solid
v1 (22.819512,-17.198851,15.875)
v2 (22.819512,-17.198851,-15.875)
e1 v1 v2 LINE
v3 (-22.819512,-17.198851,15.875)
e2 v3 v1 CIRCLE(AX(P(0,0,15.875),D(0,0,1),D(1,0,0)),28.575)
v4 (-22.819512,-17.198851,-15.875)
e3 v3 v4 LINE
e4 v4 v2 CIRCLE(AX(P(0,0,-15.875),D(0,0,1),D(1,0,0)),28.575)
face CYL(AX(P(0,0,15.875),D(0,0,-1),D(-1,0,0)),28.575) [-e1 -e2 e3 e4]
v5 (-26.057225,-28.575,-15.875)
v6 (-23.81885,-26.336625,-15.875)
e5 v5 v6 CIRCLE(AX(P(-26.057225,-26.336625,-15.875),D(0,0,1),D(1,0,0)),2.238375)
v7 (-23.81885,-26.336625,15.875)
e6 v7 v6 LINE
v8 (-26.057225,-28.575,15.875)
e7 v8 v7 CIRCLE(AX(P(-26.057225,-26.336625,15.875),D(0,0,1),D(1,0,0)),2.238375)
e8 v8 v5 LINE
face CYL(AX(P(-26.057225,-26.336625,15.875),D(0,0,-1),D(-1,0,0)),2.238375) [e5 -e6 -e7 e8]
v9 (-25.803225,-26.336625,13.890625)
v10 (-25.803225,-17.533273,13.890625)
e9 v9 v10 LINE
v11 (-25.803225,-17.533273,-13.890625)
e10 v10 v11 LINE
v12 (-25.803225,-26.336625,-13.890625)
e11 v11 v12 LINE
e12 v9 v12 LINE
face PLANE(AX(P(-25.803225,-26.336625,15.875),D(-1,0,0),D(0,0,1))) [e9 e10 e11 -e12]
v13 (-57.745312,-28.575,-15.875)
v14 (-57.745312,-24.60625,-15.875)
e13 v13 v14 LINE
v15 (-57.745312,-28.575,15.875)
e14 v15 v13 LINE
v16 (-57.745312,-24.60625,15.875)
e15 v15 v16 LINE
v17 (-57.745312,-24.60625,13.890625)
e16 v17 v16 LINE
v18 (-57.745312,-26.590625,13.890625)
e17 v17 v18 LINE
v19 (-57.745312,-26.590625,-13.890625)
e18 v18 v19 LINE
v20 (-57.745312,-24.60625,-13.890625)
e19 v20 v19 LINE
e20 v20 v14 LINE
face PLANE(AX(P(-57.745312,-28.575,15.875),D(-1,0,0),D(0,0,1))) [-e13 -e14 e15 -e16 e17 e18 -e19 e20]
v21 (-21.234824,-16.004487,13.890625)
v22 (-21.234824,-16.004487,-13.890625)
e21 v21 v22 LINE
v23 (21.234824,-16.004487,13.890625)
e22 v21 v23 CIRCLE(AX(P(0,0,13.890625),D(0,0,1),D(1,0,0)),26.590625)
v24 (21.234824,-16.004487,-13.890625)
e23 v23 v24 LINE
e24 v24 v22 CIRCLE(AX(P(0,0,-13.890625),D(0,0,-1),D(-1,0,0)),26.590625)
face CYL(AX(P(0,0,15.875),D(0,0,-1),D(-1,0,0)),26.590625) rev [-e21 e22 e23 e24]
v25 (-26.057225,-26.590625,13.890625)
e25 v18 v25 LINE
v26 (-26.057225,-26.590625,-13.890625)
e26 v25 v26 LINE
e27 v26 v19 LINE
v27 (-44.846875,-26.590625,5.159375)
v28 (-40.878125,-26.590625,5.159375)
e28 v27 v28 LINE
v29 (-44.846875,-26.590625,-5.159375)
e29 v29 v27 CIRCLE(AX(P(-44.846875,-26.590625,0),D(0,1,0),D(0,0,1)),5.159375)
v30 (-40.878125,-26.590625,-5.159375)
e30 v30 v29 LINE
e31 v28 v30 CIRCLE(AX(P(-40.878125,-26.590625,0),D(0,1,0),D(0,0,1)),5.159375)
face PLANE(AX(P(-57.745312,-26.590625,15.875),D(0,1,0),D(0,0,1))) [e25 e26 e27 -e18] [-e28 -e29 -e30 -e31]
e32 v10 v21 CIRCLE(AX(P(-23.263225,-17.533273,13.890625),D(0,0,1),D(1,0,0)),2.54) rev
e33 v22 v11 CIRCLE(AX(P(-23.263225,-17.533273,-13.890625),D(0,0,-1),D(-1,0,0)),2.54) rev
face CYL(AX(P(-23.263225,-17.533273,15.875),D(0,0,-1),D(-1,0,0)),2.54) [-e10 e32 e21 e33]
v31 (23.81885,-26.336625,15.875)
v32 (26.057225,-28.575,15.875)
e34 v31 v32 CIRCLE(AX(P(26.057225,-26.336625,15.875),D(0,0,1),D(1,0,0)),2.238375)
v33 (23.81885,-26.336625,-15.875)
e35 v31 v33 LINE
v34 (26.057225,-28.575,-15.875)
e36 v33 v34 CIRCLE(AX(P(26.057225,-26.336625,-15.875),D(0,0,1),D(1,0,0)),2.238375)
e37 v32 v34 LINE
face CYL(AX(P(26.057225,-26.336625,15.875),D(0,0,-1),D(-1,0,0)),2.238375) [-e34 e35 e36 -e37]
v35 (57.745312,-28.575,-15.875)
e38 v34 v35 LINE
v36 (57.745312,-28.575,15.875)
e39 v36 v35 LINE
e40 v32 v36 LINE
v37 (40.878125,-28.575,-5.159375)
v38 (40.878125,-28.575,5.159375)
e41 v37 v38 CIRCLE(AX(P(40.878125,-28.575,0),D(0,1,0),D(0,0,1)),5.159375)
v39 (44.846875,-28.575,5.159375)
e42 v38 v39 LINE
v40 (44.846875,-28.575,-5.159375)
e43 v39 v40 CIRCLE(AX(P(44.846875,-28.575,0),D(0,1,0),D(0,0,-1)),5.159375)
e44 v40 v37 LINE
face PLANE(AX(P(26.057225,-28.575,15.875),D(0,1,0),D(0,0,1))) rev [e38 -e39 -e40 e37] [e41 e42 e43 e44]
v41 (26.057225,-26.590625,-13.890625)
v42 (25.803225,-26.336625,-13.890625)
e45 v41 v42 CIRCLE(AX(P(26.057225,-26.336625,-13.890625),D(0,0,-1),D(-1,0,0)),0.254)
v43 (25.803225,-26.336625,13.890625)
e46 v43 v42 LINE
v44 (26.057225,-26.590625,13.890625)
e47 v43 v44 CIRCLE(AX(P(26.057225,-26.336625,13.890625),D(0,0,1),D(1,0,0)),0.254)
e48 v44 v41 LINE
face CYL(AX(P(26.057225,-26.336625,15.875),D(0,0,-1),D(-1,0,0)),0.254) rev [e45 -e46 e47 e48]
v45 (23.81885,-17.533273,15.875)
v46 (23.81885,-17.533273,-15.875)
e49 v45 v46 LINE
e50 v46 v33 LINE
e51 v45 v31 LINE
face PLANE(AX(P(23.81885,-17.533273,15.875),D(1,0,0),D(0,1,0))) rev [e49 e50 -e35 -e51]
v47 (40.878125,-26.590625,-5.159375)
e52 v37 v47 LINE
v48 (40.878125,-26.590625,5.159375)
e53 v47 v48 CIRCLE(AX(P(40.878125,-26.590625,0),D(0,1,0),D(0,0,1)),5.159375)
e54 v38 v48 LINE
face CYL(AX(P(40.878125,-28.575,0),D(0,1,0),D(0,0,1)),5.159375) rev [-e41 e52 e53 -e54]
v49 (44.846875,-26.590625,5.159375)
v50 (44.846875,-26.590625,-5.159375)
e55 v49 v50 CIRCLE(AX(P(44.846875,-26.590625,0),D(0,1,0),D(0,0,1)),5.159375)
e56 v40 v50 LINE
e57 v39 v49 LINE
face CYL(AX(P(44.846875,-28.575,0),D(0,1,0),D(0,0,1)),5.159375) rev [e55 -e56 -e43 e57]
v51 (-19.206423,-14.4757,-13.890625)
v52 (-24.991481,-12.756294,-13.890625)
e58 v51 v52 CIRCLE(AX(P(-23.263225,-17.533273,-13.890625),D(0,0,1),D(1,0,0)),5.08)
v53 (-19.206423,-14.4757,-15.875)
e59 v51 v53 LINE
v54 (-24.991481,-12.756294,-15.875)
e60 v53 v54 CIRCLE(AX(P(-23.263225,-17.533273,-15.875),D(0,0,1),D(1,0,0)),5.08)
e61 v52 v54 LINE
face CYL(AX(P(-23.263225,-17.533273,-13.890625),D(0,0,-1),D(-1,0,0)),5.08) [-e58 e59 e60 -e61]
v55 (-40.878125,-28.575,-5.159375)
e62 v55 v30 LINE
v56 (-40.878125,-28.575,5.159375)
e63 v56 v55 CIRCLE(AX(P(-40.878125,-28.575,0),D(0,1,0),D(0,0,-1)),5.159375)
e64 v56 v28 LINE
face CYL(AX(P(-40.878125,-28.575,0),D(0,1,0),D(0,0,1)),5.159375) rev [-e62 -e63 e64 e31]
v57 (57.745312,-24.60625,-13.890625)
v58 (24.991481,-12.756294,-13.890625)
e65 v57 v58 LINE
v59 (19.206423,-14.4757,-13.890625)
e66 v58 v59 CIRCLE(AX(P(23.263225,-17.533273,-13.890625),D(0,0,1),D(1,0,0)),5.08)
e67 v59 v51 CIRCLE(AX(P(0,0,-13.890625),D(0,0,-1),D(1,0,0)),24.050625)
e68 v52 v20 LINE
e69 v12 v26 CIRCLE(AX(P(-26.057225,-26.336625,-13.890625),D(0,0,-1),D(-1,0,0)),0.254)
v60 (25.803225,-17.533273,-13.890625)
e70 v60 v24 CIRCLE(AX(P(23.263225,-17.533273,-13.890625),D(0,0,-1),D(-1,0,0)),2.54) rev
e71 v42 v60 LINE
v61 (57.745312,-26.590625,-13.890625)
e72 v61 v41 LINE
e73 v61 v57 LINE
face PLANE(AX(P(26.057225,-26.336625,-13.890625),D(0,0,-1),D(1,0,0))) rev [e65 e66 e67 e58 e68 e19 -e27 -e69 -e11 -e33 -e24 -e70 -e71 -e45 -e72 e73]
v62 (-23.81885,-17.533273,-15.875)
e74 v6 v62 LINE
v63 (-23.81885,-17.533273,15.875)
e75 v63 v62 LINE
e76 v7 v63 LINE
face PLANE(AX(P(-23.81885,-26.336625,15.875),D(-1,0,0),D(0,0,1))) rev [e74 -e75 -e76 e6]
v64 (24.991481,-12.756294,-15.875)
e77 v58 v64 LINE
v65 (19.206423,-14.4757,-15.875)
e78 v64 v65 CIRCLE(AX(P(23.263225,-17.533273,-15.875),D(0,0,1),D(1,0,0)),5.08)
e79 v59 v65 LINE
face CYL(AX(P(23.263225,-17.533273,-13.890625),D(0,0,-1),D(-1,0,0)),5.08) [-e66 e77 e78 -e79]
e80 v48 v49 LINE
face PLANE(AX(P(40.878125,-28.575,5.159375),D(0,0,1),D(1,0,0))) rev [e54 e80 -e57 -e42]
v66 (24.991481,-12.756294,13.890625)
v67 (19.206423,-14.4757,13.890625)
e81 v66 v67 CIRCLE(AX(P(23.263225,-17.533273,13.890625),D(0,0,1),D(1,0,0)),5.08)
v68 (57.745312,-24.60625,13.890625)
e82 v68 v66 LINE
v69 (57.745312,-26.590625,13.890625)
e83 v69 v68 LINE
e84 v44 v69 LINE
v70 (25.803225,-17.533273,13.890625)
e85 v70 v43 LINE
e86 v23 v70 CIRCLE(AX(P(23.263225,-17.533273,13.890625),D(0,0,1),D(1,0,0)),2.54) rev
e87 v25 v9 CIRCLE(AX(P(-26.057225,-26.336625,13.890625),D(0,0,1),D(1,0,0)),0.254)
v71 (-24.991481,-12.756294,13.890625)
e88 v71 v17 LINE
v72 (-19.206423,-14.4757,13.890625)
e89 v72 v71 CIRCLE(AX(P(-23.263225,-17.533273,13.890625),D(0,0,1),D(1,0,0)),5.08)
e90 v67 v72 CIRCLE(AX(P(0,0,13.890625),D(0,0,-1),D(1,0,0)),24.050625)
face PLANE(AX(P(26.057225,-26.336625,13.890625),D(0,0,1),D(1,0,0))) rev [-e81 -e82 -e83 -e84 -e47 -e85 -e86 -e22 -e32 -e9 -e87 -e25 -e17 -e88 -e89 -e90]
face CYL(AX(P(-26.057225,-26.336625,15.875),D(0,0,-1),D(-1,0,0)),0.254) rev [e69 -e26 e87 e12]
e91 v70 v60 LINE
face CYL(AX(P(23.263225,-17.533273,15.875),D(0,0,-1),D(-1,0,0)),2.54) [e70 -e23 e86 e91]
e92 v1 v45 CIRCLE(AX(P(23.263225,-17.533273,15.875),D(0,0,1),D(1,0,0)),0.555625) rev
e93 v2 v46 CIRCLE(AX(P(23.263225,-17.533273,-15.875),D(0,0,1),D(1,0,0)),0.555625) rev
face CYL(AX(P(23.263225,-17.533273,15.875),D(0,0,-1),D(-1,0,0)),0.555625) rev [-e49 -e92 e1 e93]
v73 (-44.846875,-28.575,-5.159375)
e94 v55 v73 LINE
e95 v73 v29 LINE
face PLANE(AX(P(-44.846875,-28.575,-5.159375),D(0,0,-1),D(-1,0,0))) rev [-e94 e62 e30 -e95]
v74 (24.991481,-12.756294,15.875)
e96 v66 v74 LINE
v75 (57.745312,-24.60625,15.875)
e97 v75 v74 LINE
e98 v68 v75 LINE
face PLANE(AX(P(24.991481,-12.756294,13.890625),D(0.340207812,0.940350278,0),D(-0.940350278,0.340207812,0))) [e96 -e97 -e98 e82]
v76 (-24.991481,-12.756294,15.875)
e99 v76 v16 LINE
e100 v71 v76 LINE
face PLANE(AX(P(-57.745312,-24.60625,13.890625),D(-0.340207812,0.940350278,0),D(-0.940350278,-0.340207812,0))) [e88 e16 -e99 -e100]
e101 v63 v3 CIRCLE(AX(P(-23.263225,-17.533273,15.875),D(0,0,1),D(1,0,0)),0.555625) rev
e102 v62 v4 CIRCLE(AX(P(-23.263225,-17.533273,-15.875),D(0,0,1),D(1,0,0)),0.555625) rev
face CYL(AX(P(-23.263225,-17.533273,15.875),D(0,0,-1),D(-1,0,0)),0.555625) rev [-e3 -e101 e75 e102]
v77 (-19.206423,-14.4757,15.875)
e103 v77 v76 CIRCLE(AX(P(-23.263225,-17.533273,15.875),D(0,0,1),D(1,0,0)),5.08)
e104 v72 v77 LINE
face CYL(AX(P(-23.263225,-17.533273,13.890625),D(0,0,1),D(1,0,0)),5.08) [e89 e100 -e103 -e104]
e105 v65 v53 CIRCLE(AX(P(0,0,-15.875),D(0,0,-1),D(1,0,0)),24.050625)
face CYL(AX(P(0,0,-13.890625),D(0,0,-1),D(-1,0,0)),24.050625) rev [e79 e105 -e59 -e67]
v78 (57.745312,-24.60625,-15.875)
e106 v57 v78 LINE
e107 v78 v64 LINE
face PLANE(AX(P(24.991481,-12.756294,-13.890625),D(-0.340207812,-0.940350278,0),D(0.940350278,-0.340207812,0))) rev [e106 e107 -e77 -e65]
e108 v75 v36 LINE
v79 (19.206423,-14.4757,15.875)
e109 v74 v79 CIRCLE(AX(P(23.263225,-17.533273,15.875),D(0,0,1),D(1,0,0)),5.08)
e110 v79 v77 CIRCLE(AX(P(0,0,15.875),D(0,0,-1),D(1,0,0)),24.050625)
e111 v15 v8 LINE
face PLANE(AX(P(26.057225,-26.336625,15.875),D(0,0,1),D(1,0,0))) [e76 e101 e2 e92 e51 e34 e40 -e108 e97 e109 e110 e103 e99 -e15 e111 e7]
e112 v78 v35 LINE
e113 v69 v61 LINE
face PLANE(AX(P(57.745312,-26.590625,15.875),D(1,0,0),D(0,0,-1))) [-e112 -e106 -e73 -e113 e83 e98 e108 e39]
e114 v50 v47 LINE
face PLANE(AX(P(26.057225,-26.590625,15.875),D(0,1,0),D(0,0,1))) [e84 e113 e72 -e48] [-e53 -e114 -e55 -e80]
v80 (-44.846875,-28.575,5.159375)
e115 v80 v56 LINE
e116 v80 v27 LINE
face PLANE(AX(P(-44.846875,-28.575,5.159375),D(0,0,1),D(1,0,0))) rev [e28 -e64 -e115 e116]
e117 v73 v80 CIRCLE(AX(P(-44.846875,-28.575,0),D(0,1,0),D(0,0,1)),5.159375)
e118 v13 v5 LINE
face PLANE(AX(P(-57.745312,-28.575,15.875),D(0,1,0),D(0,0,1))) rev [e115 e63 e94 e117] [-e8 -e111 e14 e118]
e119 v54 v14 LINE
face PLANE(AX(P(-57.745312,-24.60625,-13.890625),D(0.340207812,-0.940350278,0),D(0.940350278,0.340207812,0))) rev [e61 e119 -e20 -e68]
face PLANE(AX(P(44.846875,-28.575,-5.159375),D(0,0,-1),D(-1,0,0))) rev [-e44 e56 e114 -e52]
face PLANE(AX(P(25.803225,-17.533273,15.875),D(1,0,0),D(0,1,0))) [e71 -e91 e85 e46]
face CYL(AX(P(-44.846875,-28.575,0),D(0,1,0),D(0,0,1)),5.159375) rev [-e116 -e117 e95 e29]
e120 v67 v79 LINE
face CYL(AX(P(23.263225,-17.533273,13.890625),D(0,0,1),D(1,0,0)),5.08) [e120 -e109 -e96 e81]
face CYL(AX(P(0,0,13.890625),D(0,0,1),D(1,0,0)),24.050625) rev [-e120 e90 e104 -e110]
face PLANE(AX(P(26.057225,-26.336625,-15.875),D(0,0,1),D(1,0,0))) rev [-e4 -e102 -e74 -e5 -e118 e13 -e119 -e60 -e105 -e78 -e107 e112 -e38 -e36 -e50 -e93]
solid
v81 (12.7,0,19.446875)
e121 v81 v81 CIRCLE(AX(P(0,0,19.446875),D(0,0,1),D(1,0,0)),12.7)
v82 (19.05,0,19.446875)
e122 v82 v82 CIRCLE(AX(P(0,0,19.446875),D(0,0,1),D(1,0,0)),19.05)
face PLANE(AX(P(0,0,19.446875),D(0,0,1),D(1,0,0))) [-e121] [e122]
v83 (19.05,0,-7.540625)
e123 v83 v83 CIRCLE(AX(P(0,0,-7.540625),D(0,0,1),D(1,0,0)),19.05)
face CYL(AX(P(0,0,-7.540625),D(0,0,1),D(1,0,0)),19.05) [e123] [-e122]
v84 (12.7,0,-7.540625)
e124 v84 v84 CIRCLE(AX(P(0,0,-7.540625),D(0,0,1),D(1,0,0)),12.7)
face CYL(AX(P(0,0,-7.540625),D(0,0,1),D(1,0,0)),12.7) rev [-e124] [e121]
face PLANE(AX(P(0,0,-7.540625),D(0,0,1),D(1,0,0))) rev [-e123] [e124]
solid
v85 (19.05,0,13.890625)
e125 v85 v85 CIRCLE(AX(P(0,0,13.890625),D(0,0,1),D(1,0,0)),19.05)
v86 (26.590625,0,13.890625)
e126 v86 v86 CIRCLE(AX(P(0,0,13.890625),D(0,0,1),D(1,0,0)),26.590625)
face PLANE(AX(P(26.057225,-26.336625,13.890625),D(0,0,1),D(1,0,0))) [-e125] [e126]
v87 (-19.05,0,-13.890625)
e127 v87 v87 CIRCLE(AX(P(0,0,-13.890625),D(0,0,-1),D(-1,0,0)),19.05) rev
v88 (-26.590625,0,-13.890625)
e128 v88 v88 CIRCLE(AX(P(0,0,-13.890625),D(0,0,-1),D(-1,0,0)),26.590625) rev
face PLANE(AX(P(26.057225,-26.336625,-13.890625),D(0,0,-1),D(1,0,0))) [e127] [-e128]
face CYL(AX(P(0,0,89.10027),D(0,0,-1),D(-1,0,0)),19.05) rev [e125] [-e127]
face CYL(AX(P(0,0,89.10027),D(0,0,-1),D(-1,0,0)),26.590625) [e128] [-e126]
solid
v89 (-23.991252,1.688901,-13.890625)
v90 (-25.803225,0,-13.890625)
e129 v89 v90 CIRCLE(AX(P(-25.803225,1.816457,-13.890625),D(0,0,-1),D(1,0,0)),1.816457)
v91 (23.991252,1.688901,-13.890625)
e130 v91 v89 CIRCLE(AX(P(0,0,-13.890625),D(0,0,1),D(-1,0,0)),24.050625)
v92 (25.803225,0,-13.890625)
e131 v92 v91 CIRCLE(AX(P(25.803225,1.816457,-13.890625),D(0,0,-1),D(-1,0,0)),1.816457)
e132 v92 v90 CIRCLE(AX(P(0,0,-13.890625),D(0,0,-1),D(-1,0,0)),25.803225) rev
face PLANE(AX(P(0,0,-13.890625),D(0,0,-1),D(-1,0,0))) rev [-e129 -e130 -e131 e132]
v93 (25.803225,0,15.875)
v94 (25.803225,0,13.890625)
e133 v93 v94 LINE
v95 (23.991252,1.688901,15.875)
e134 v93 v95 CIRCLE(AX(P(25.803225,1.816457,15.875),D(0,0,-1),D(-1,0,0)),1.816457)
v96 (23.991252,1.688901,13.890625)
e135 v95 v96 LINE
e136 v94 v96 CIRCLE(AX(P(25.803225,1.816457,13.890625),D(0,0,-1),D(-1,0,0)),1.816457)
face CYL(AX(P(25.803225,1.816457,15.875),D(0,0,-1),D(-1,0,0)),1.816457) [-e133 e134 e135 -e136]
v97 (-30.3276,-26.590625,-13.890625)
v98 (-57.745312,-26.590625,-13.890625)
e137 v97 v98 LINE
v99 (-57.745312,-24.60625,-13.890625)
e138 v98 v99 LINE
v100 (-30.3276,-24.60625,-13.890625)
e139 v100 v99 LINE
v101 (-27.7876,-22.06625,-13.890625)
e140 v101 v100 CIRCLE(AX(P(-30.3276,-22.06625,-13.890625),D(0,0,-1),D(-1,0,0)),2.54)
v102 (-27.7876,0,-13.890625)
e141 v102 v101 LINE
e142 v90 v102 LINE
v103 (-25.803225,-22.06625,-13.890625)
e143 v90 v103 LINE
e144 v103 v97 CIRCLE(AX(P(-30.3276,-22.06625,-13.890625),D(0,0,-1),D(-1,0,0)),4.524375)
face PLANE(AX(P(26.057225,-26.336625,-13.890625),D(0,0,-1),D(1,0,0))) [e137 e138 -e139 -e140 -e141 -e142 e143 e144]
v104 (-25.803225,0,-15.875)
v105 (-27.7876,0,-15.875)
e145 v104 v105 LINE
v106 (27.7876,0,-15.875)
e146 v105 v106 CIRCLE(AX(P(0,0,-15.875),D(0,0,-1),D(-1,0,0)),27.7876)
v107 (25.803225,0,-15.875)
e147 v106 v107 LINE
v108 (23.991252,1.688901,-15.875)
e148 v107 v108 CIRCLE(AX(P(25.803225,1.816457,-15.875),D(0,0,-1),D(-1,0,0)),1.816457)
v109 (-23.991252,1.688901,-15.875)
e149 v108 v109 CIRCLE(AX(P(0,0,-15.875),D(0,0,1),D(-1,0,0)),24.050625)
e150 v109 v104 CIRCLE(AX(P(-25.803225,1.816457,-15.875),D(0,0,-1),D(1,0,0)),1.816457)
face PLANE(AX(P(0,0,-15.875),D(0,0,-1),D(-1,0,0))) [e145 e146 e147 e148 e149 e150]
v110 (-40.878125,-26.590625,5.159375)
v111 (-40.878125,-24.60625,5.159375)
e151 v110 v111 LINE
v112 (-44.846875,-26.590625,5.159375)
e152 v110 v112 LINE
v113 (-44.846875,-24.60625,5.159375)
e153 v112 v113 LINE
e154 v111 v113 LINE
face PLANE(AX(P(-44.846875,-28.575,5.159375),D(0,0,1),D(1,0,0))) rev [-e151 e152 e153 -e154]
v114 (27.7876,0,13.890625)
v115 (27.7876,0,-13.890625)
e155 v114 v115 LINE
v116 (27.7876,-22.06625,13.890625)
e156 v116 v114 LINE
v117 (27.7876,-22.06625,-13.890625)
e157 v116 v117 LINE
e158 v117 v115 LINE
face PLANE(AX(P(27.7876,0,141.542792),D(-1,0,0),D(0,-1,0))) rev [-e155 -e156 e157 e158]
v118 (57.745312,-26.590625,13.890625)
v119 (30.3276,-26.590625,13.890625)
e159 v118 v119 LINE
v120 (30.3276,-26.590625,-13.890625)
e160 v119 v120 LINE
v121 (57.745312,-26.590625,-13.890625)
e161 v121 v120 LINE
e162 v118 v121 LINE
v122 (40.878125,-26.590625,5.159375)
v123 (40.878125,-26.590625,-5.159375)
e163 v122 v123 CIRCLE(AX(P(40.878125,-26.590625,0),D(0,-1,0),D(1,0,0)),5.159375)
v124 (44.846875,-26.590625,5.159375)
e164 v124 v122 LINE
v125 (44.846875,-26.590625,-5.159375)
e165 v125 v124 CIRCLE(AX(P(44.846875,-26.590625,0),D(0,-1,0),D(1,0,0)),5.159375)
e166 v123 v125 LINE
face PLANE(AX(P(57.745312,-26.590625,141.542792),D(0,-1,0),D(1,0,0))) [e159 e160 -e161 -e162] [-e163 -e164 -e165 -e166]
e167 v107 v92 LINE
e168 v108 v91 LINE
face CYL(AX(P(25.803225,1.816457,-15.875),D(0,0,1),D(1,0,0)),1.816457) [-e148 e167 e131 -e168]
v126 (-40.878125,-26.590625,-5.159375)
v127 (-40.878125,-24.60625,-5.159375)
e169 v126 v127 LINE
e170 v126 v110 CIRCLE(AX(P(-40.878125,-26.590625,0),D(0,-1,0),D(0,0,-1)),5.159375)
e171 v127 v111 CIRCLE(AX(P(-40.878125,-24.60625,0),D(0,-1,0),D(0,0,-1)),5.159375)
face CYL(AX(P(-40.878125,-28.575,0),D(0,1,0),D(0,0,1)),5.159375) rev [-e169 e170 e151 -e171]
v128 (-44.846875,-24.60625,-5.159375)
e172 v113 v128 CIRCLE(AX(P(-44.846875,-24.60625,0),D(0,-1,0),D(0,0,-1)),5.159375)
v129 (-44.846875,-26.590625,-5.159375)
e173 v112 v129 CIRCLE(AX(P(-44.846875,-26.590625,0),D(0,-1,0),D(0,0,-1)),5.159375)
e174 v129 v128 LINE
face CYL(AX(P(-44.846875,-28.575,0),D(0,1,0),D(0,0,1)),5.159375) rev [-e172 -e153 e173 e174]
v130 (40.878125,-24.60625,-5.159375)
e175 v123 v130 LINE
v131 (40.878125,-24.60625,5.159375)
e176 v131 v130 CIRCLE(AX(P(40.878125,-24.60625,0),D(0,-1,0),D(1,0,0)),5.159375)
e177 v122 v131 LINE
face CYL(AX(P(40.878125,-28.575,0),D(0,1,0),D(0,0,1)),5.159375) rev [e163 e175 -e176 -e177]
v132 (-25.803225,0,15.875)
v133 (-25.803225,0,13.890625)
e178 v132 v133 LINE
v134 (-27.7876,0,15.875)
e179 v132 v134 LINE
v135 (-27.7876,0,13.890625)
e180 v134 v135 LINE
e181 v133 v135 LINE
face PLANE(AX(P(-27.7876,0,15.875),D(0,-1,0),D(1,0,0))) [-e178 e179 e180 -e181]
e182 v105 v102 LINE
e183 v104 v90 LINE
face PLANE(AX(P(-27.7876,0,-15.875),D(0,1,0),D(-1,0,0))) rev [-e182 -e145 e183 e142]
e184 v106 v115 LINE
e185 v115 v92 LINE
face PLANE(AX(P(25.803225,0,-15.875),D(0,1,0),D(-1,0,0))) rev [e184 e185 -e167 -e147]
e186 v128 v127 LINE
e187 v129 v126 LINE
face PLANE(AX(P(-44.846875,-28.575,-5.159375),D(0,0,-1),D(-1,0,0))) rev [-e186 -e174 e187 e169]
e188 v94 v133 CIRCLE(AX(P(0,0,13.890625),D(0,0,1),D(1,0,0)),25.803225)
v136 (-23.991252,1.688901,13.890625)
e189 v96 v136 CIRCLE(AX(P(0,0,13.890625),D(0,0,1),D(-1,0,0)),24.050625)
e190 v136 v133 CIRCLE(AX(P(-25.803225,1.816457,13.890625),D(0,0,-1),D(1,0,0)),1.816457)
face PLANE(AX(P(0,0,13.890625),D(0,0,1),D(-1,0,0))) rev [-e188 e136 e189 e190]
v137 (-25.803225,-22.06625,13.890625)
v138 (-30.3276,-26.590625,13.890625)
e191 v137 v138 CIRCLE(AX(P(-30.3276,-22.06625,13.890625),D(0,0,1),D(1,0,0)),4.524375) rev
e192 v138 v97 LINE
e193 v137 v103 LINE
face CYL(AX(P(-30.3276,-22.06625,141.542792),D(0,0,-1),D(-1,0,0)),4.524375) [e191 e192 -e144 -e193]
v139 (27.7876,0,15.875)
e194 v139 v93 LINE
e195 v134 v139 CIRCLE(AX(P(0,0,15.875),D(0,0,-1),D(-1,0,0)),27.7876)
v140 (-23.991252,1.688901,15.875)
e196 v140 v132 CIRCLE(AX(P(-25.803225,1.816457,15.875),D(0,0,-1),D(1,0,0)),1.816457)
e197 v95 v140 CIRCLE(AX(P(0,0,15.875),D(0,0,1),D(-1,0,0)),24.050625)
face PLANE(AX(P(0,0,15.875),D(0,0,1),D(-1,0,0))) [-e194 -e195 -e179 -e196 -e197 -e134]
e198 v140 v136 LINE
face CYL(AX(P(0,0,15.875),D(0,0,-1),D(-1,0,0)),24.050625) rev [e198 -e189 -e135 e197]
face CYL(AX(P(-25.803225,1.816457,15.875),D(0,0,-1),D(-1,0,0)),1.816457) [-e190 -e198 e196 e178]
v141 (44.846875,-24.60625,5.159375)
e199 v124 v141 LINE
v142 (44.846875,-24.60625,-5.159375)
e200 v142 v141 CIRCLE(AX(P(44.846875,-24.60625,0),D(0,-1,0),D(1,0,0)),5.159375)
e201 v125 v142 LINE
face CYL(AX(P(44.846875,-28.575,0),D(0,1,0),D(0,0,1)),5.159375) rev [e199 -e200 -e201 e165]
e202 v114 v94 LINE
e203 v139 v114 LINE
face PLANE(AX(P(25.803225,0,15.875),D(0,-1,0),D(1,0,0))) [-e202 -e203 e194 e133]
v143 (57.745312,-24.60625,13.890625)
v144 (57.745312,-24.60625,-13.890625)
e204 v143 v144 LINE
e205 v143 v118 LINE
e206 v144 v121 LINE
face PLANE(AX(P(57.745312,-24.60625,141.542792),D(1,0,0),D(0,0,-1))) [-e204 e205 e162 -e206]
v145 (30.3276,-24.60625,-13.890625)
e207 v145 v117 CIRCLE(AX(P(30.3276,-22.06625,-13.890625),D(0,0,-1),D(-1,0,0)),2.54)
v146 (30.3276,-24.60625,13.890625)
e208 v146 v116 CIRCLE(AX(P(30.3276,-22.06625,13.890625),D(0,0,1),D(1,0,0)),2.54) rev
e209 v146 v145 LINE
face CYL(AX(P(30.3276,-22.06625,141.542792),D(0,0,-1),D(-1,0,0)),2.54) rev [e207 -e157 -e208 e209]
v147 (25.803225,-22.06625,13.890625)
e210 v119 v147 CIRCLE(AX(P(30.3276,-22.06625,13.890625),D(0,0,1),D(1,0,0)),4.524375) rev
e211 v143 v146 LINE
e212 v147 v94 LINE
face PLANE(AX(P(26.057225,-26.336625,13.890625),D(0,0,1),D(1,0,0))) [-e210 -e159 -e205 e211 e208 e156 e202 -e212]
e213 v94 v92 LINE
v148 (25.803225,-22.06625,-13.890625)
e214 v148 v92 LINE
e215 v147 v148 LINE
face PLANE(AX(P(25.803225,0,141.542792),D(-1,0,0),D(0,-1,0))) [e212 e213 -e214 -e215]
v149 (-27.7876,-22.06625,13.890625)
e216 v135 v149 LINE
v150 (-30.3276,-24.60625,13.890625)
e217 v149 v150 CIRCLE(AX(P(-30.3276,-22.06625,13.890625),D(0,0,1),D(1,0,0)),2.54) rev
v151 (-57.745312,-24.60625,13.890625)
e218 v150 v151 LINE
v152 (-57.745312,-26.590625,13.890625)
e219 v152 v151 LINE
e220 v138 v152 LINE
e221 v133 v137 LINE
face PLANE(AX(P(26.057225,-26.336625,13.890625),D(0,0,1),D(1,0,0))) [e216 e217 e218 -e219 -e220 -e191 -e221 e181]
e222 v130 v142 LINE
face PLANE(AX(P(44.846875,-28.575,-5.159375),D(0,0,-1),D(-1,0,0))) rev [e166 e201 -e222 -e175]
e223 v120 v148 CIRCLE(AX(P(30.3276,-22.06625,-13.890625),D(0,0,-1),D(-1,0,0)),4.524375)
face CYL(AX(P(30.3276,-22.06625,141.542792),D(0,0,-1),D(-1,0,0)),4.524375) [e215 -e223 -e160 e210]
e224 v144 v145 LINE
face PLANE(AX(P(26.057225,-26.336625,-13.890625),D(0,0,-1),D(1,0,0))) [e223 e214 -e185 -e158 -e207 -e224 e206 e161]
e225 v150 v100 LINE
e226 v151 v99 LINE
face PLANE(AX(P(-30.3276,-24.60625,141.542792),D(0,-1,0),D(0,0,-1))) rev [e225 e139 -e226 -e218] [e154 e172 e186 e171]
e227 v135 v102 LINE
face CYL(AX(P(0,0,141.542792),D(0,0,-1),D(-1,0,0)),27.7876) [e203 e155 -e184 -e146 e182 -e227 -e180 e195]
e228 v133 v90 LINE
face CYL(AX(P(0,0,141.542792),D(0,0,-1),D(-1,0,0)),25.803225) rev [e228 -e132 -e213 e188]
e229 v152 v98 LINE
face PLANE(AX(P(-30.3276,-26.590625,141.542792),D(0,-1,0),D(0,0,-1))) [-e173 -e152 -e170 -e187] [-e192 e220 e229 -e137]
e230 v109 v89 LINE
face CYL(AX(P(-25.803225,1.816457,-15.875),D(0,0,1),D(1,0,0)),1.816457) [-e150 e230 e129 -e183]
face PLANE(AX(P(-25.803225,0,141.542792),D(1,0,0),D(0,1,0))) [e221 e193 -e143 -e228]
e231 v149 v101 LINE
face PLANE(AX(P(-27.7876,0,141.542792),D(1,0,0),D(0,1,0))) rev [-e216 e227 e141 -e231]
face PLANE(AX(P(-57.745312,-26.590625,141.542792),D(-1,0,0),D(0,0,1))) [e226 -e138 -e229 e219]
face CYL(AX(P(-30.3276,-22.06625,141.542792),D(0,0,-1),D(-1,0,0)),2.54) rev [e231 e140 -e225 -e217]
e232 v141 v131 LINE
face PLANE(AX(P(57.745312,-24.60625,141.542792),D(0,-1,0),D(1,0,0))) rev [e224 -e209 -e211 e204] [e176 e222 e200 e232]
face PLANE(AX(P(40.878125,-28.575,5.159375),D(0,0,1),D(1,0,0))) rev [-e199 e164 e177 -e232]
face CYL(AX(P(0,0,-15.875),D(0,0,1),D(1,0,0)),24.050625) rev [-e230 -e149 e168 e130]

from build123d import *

# Parameters (mm, degrees)
EXTRUDE_THIN2_DEPTH      = 15.875
EXTRUDE1_DEPTH           = 1.984375
EXTRUDE_THIN3_DEPTH      = 13.890625
EXTRUDE_THIN3_DEPTH_BACK = 13.890625
EXTRUDE2_DEPTH           = 1.984375
EXTRUDE3_START           = -13.890625
EXTRUDE3_OUTLINE_R       = 26.590625
EXTRUDE3_OUTLINE_R_2     = 19.05
EXTRUDE3_DEPTH           = 27.78125
SKETCH8_R                = 19.05
SKETCH8_R_2              = 12.7
EXTRUDE4_DEPTH           = 26.9875
CUT_EXTRUDE1_DEPTH       = 68.299574204


# Read off the part's stored shape, not the designer's step: Extrude3
with BuildPart() as part:
    # Sketch1 → Extrude-Thin2 (new, symmetric)
    with BuildSketch(Plane.XY):
        with BuildLine():
            Line((-57.7453125, -26.590625), (-26.057225, -26.590625))
            ThreePointArc((-26.057225, -26.590625), (-25.877619878, -26.516230122), (-25.803225, -26.336625))
            Line((-25.803225, -26.336625), (-25.803225, -17.533273382))
            ThreePointArc((-25.803225, -17.533273382), (-24.069283693, -15.124566388), (-21.23482391, -16.004486602))
            ThreePointArc((-21.23482391, -16.004486602), (0, -26.590625), (21.23482391, -16.004486602))
            ThreePointArc((21.23482391, -16.004486602), (24.069283693, -15.124566388), (25.803225, -17.533273382))
            Line((25.803225, -17.533273382), (25.803225, -26.336625))
            ThreePointArc((25.803225, -26.336625), (25.877619878, -26.516230122), (26.057225, -26.590625))
            Line((26.057225, -26.590625), (57.7453125, -26.590625))
            Line((57.7453125, -26.590625), (57.7453125, -28.575))
            Line((57.7453125, -28.575), (26.057225, -28.575))
            ThreePointArc((26.057225, -28.575), (24.474454859, -27.919395141), (23.81885, -26.336625))
            Line((23.81885, -26.336625), (23.81885, -17.533273382))
            ThreePointArc((23.81885, -17.533273382), (23.439550339, -17.006368727), (22.819512262, -17.198851274))
            ThreePointArc((22.819512262, -17.198851274), (0, -28.575), (-22.819512262, -17.198851274))
            ThreePointArc((-22.819512262, -17.198851274), (-23.439550339, -17.006368727), (-23.81885, -17.533273382))
            Line((-23.81885, -17.533273382), (-23.81885, -26.336625))
            ThreePointArc((-23.81885, -26.336625), (-24.474454859, -27.919395141), (-26.057225, -28.575))
            Line((-26.057225, -28.575), (-57.7453125, -28.575))
            Line((-57.7453125, -28.575), (-57.7453125, -26.590625))
        make_face()
    extrude(amount=EXTRUDE_THIN2_DEPTH, both=True)

    # Sketch4 → Extrude1 (add)
    with BuildSketch(Plane.XY.offset(15.875)):
        with BuildLine():
            Line((-57.7453125, -24.60625), (-24.991480683, -12.756293971))
            ThreePointArc((-24.991480683, -12.756293971), (-21.815944337, -12.663799213), (-19.20642282, -14.475699822))
            ThreePointArc((-19.20642282, -14.475699822), (0, -24.050625), (19.20642282, -14.475699822))
            ThreePointArc((19.20642282, -14.475699822), (21.815944337, -12.663799213), (24.991480683, -12.756293971))
            Line((24.991480683, -12.756293971), (57.7453125, -24.60625))
            Line((57.7453125, -24.60625), (57.7453125, -28.575))
            Line((57.7453125, -28.575), (26.057225, -28.575))
            ThreePointArc((26.057225, -28.575), (24.474454859, -27.919395141), (23.81885, -26.336625))
            Line((23.81885, -26.336625), (23.81885, -17.533273382))
            ThreePointArc((23.81885, -17.533273382), (23.439550339, -17.006368727), (22.819512262, -17.198851274))
            ThreePointArc((22.819512262, -17.198851274), (0, -28.575), (-22.819512262, -17.198851274))
            ThreePointArc((-22.819512262, -17.198851274), (-23.439550339, -17.006368727), (-23.81885, -17.533273382))
            Line((-23.81885, -17.533273382), (-23.81885, -26.336625))
            ThreePointArc((-23.81885, -26.336625), (-24.474454859, -27.919395141), (-26.057225, -28.575))
            Line((-26.057225, -28.575), (-57.7453125, -28.575))
            Line((-57.7453125, -28.575), (-57.7453125, -24.60625))
        make_face()
    extrude1 = extrude(amount=-EXTRUDE1_DEPTH)

    # Mirror1: Extrude1 across plane
    add(extrude1.mirror(Plane.XY))


with BuildPart() as body_2:
    # Sketch5 → Extrude-Thin3 (new, two sides: drawn at the far end of the back side and taken through both)
    with BuildSketch(Plane.XY.offset(-EXTRUDE_THIN3_DEPTH_BACK)):
        with BuildLine():
            Line((57.7453125, -24.60625), (30.3276, -24.60625))
            ThreePointArc((30.3276, -24.60625), (28.531548776, -23.862301224), (27.7876, -22.06625))
            Line((27.7876, -22.06625), (27.7876, 0))
            ThreePointArc((27.7876, 0), (0, 27.7876), (-27.7876, 0))
            Line((-27.7876, 0), (-27.7876, -22.06625))
            ThreePointArc((-27.7876, -22.06625), (-28.531548776, -23.862301224), (-30.3276, -24.60625))
            Line((-30.3276, -24.60625), (-57.7453125, -24.60625))
            Line((-57.7453125, -24.60625), (-57.7453125, -26.590625))
            Line((-57.7453125, -26.590625), (-30.3276, -26.590625))
            ThreePointArc((-30.3276, -26.590625), (-27.128383757, -25.265466243), (-25.803225, -22.06625))
            Line((-25.803225, -22.06625), (-25.803225, 0))
            ThreePointArc((-25.803225, 0), (0, 25.803225), (25.803225, 0))
            Line((25.803225, 0), (25.803225, -22.06625))
            ThreePointArc((25.803225, -22.06625), (27.128383757, -25.265466243), (30.3276, -26.590625))
            Line((30.3276, -26.590625), (57.7453125, -26.590625))
            Line((57.7453125, -26.590625), (57.7453125, -24.60625))
        make_face()
    extrude(amount=EXTRUDE_THIN3_DEPTH + EXTRUDE_THIN3_DEPTH_BACK)

    # Sketch6 → Extrude2 (add)
    with BuildSketch(Plane(origin=(0, 0, -13.890625), x_dir=(-1, 0, 0), z_dir=(0, 0, -1))):
        with BuildLine():
            Line((-25.803225, 0), (-27.7876, 0))
            ThreePointArc((-27.7876, 0), (0, 27.7876), (27.7876, 0))
            Line((27.7876, 0), (25.803225, 0))
            ThreePointArc((25.803225, 0), (24.56471473, 0.487695001), (23.991252112, 1.688900533))
            ThreePointArc((23.991252112, 1.688900533), (0, 24.050625), (-23.991252112, 1.688900533))
            ThreePointArc((-23.991252112, 1.688900533), (-24.56471473, 0.487695001), (-25.803225, 0))
        make_face()
    extrude2 = extrude(amount=EXTRUDE2_DEPTH)

    # Mirror2: Extrude2 across plane
    add(extrude2.mirror(Plane.XY))


with BuildPart() as body_3:
    # Extrude3 outline → Extrude3 (new body)
    with BuildSketch(Plane.XY.offset(EXTRUDE3_START)):
        Circle(EXTRUDE3_OUTLINE_R)
        Circle(EXTRUDE3_OUTLINE_R_2, mode=Mode.SUBTRACT)
    extrude(amount=EXTRUDE3_DEPTH)


with BuildPart() as body_4:
    # Sketch8 → Extrude4 (new body)
    with BuildSketch(Plane.XY.offset(19.446875)):
        Circle(SKETCH8_R)
        Circle(SKETCH8_R_2, mode=Mode.SUBTRACT)
    extrude(amount=-EXTRUDE4_DEPTH)


with BuildPart() as cut_extrude1_tool:
    # Sketch3 → Cut-Extrude1 (new, through all)
    with BuildSketch(Plane(origin=(0, 0, 0), x_dir=(1, 0, 0), z_dir=(0, 1, 0))):
        with BuildLine():
            Line((-44.846875, 5.159375), (-40.878125, 5.159375))
            ThreePointArc((-40.878125, 5.159375), (-35.71875, 0), (-40.878125, -5.159375))
            Line((-40.878125, -5.159375), (-44.846875, -5.159375))
            ThreePointArc((-44.846875, -5.159375), (-50.00625, 0), (-44.846875, 5.159375))
        make_face()
        with BuildLine():
            Line((40.878125, -5.159375), (44.846875, -5.159375))
            ThreePointArc((44.846875, -5.159375), (50.00625, 0), (44.846875, 5.159375))
            Line((44.846875, 5.159375), (40.878125, 5.159375))
            ThreePointArc((40.878125, 5.159375), (35.71875, 0), (40.878125, -5.159375))
        make_face()
    extrude(amount=-CUT_EXTRUDE1_DEPTH)


with BuildPart() as part_1:
    add(part.part)

    # Cut-Extrude1: cut by cut_extrude1_tool
    add(cut_extrude1_tool.part, mode=Mode.SUBTRACT)


with BuildPart() as body_2_1:
    add(body_2.part)

    # Cut-Extrude1: cut by cut_extrude1_tool
    add(cut_extrude1_tool.part, mode=Mode.SUBTRACT)


solid = Compound([body_3.part, body_4.part, part_1.part, body_2_1.part])
